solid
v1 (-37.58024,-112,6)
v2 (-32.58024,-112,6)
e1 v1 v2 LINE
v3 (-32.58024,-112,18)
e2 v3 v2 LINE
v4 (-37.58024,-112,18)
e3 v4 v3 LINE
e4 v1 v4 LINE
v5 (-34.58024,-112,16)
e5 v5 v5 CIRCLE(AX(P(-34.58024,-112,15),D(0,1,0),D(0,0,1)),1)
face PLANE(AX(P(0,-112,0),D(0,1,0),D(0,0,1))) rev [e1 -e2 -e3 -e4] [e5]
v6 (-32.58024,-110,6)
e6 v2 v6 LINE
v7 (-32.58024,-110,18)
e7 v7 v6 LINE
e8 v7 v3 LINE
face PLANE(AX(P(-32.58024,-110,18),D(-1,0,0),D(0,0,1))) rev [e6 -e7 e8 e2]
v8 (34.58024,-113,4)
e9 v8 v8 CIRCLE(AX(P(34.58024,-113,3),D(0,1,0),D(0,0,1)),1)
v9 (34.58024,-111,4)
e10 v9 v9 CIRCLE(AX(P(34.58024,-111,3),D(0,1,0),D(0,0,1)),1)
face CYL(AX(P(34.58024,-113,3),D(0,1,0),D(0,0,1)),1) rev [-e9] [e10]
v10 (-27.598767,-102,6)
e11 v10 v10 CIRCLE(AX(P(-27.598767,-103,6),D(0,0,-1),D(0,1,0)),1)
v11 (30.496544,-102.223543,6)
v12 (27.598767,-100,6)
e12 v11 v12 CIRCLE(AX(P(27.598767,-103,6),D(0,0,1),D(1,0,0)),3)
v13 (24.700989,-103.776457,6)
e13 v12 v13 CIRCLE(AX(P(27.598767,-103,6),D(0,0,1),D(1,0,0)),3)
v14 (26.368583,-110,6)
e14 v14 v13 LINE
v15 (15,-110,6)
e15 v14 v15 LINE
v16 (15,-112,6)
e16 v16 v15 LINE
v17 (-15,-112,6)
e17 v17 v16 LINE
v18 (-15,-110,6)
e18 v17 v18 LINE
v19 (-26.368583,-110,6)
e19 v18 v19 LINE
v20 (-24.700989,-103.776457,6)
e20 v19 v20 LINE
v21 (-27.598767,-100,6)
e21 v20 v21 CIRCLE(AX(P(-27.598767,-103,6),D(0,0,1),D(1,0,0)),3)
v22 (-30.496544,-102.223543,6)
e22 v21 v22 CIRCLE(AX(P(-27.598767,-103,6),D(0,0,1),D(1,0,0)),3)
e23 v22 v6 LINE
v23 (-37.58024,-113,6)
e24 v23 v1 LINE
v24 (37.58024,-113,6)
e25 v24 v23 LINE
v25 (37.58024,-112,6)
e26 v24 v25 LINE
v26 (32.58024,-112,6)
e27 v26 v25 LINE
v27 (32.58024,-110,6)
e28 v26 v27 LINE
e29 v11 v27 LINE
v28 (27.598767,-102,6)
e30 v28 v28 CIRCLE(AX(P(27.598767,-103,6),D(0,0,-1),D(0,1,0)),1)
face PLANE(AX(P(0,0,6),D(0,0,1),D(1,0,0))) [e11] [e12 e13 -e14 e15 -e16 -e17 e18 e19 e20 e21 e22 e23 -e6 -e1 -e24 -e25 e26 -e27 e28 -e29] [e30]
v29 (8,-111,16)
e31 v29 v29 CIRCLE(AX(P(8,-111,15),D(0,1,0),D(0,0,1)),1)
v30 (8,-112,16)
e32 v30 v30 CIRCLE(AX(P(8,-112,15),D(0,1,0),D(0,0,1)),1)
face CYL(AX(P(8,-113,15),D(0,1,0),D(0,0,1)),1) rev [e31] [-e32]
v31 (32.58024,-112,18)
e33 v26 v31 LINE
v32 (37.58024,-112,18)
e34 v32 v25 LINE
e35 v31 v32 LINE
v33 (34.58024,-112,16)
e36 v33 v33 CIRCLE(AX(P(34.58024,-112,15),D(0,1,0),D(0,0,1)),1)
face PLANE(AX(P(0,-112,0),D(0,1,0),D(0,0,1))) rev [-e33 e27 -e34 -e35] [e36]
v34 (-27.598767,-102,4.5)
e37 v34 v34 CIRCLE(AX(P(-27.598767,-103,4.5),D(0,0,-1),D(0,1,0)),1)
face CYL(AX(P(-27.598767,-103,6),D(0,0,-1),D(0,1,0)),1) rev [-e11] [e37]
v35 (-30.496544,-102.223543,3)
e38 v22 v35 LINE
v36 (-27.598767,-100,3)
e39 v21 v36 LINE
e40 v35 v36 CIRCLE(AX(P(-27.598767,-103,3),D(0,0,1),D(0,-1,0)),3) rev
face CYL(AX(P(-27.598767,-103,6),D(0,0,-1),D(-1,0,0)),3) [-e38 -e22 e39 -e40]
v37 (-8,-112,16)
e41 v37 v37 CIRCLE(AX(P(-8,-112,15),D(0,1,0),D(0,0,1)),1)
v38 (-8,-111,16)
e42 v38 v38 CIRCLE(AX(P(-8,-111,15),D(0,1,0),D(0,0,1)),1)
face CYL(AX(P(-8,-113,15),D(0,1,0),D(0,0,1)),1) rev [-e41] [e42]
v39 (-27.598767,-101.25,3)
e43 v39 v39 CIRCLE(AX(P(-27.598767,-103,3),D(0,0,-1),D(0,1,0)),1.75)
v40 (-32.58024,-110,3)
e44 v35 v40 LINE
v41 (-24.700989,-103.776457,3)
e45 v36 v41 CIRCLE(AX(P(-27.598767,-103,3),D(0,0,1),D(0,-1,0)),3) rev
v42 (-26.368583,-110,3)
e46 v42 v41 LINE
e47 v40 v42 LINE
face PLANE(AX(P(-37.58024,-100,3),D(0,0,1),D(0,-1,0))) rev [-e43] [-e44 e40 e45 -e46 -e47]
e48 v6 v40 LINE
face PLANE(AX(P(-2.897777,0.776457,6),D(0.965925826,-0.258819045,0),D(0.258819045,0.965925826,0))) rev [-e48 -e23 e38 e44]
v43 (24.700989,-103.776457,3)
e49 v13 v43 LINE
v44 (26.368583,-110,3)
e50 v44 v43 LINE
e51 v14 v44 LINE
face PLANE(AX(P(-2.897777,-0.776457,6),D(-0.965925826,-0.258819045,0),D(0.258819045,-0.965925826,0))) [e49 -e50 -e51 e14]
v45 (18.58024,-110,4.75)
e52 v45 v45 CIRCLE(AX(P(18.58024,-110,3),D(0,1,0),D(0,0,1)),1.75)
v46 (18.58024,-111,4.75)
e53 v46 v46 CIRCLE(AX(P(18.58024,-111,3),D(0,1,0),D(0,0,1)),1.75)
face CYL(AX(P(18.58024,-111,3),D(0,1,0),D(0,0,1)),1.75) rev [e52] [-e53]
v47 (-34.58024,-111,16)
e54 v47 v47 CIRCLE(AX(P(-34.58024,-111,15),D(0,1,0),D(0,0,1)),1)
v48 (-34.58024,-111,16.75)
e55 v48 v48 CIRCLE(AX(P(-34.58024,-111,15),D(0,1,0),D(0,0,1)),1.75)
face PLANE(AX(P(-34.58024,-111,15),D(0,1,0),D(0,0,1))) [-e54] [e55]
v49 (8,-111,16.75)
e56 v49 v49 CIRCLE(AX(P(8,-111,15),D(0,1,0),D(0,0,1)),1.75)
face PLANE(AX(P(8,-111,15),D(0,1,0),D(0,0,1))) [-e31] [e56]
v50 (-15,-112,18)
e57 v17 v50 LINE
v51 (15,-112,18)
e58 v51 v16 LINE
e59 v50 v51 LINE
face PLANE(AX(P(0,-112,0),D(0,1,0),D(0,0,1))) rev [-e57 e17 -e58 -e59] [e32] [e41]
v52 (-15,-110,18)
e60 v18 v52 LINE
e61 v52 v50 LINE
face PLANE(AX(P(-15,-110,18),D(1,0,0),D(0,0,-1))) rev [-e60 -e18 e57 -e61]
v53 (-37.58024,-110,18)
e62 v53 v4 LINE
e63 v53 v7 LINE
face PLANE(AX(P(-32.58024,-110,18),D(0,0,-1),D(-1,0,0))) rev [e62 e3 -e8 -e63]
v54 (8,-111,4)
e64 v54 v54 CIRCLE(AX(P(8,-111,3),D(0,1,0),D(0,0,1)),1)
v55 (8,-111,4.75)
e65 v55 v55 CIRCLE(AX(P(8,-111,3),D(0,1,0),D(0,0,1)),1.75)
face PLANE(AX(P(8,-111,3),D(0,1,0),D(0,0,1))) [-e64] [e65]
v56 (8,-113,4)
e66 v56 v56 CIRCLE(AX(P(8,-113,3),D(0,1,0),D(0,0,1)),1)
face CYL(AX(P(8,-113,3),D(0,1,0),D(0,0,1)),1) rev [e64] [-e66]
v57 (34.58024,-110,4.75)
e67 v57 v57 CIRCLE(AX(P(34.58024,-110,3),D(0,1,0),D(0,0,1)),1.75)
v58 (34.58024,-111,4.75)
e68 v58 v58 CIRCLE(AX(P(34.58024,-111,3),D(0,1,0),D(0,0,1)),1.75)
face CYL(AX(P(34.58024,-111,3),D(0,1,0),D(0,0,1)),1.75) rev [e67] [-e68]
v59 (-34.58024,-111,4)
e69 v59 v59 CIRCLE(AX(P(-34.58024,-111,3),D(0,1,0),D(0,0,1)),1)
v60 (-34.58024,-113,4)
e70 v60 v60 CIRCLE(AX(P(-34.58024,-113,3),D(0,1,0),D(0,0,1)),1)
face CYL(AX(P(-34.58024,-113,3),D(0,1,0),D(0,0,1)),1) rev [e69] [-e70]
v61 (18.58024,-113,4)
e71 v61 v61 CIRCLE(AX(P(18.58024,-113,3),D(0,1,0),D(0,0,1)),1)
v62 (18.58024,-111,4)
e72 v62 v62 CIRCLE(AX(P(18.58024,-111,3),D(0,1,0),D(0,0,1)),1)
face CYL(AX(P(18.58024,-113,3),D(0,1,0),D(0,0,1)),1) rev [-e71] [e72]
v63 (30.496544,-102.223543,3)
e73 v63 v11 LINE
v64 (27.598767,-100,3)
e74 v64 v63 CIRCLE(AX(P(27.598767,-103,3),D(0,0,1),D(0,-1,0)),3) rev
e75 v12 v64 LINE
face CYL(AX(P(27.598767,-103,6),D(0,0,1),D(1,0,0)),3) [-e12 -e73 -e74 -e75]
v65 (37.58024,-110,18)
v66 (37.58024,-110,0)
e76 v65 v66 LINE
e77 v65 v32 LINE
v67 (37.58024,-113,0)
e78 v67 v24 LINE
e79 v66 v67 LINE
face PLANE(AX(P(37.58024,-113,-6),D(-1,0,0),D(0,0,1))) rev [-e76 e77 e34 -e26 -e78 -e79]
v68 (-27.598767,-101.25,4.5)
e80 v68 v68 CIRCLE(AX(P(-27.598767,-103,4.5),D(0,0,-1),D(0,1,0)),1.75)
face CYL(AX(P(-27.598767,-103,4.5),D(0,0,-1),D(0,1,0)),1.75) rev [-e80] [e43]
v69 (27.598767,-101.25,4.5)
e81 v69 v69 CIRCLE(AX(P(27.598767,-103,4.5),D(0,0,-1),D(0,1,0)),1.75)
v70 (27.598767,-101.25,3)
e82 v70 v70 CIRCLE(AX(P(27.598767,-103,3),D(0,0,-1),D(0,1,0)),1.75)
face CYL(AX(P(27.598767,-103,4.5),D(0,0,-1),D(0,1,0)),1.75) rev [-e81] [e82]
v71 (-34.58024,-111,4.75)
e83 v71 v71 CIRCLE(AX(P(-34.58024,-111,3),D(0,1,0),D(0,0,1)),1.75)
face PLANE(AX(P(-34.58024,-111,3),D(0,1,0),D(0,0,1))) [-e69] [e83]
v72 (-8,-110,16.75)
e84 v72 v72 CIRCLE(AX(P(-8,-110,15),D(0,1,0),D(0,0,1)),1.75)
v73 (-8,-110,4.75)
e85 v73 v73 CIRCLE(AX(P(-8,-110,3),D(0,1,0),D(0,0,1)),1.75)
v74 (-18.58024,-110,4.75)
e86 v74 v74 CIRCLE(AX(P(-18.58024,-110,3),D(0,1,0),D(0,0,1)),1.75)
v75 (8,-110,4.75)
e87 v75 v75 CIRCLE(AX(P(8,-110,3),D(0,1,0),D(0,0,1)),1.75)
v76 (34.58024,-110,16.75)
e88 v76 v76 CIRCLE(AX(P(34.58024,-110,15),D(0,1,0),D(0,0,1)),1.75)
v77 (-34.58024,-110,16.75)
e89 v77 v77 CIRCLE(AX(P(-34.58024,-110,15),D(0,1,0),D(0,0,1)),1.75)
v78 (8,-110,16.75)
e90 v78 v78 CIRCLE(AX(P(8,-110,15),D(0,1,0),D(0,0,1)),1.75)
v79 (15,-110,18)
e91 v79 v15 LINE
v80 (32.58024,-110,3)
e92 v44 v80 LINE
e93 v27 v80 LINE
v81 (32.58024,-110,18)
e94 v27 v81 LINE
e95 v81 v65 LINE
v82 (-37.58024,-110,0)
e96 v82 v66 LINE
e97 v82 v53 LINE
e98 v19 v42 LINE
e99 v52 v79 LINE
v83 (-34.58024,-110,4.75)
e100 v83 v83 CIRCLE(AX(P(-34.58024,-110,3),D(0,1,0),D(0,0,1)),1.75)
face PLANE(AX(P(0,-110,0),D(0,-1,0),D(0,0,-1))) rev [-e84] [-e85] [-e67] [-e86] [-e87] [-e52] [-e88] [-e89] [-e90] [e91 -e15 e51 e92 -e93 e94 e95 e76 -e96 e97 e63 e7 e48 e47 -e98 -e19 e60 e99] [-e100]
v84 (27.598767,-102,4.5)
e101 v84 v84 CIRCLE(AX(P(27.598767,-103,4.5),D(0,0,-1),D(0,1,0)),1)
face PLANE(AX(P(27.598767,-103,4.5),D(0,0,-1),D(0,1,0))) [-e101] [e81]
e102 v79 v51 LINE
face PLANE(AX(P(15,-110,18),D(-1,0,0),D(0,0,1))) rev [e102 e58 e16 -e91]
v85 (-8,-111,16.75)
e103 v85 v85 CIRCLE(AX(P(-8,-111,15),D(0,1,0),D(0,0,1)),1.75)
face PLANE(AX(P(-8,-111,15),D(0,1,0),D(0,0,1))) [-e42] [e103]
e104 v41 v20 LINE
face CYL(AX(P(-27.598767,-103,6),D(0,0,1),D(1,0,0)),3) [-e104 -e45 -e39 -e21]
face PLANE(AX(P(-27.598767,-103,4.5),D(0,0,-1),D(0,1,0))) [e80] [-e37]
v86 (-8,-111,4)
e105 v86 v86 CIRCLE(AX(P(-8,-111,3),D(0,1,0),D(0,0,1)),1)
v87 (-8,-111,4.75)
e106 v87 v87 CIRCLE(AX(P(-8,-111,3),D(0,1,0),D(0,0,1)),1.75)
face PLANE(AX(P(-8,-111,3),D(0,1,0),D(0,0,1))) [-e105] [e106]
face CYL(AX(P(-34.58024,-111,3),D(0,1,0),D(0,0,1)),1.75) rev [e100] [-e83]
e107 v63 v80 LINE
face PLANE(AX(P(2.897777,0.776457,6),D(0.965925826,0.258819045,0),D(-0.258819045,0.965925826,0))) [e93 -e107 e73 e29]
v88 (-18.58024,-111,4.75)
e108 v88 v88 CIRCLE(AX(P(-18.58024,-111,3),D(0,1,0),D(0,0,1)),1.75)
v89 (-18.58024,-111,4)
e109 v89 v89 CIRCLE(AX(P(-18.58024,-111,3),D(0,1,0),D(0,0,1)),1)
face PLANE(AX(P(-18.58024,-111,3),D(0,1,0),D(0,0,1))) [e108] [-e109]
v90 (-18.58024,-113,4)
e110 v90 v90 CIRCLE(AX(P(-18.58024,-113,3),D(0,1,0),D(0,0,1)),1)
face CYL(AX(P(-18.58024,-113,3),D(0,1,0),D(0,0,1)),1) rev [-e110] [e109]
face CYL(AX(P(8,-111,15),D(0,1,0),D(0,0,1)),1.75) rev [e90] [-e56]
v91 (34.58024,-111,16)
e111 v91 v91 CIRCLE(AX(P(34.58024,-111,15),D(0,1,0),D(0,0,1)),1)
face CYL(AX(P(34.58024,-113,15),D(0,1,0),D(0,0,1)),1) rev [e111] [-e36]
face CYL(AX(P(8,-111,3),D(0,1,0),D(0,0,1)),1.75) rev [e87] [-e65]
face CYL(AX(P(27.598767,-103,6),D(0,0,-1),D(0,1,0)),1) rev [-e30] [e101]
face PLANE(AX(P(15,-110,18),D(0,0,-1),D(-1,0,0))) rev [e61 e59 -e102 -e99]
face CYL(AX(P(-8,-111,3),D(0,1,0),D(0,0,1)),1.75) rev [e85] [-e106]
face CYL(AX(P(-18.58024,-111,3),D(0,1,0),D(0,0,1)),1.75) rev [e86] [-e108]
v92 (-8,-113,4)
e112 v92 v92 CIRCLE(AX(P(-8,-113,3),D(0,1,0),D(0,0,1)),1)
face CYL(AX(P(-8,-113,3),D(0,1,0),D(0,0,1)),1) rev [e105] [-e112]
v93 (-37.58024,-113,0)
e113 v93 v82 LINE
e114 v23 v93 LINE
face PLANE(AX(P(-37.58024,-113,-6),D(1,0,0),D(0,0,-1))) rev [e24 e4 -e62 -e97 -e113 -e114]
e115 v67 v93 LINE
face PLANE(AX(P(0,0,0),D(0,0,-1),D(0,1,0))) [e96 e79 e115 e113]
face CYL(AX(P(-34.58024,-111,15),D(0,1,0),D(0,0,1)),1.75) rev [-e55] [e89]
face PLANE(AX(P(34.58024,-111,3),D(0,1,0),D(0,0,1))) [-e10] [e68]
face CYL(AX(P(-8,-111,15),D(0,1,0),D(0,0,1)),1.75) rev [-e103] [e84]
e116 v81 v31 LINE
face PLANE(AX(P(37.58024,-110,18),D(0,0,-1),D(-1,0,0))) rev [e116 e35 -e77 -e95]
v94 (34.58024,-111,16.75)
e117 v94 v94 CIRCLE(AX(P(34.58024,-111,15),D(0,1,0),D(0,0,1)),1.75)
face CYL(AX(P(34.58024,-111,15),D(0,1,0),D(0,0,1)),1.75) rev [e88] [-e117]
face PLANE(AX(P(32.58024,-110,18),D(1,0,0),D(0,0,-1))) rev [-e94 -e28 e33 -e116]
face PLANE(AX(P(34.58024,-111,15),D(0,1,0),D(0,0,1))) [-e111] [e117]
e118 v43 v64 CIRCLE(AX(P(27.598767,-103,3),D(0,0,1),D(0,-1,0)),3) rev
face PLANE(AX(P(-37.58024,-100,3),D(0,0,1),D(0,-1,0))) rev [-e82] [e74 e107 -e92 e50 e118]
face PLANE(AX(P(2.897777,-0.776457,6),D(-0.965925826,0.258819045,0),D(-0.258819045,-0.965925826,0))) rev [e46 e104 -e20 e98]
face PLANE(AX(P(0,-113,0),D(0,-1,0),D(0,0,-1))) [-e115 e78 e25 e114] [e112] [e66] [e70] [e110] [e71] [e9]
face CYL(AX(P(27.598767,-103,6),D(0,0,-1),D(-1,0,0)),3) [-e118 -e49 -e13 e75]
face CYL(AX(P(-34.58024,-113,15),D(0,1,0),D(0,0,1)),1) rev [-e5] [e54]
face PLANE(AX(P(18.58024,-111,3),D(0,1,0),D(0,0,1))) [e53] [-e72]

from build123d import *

# Parameters (mm, degrees)
SKETCH_1_R           = 0.75
EXTRUDE_1_DEPTH      = 6
SKETCH_2_R           = 1
CUT_EXTRUDE_1_DEPTH  = 1.5
SKETCH_3_W           = 75.160479418
SKETCH_3_H           = 12
EXTRUDE_2_DEPTH      = 3
SKETCH_4_R           = 0.75
CUT_EXTRUDE_2_DEPTH  = 3
SKETCH_5_W           = 5
SKETCH_5_H           = 12
SKETCH_5_W_2         = 30
CUT_EXTRUDE_3_DEPTH  = 2
SKETCH_6_OUTSIDE_W   = 104.908
SKETCH_6_OUTSIDE_H   = 145.748
SKETCH_6_OUTSIDE_W_2 = 75.160479418
SKETCH_6_OUTSIDE_H_2 = 13
CUT_EXTRUDE_4_DEPTH  = 120.23621269
SKETCH_7_W           = 9
SKETCH_7_H           = 13
CUT_EXTRUDE_5_DEPTH  = 136.845859953
SKETCH_8_R           = 1
CUT_EXTRUDE_6_DEPTH  = 120.122938247
SKETCH_8_3_R         = 1.75
SKETCH_8_3_R_2       = 1
CUT_EXTRUDE_7_DEPTH  = 1.5
SKETCH_9_W           = 5
SKETCH_9_H           = 15
SKETCH_9_W_2         = 30
EXTRUDE_3_DEPTH      = 2
SKETCH_10_W          = 75.160479418
SKETCH_10_H          = 3
EXTRUDE_4_DEPTH      = 3
SKETCH_11_R          = 1
CUT_EXTRUDE_8_DEPTH  = 43.851772619
SKETCH_11_3_R        = 1.75
SKETCH_11_3_R_2      = 1
CUT_EXTRUDE_9_DEPTH  = 1
FILLET_1_R           = 3


with BuildPart() as part:
    # 草图1 → 凸台-拉伸1 (new body)
    with BuildSketch(Plane.XY):
        with BuildLine():
            Line((0, -11.591109915), (26.368582626, -110))
            Line((26.368582626, -110), (32.580239709, -110))
            Line((32.580239709, -110), (2.897777479, 0.776457135))
            ThreePointArc((2.897777479, 0.776457135), (0, 3), (-2.897777479, 0.776457135))
            Line((-2.897777479, 0.776457135), (-32.580239709, -110))
            Line((-32.580239709, -110), (-26.368582626, -110))
            Line((-26.368582626, -110), (0, -11.591109915))
        make_face()
        with Locations((13.665408814, -51)):
            Circle(SKETCH_1_R, mode=Mode.SUBTRACT)
        Circle(SKETCH_1_R, mode=Mode.SUBTRACT)
        with Locations((-13.665408814, -51)):
            Circle(SKETCH_1_R, mode=Mode.SUBTRACT)
    extrude(amount=EXTRUDE_1_DEPTH)

    # 草图2 → 切除-拉伸1 (cut)
    with BuildSketch(Plane(origin=(0, 0, 0), x_dir=(-1, 0, 0), z_dir=(0, 0, -1))):
        Circle(SKETCH_2_R)
        with Locations((13.665408814, -51)):
            Circle(SKETCH_2_R)
        with Locations((-13.665408814, -51)):
            Circle(SKETCH_2_R)
    extrude(amount=-CUT_EXTRUDE_1_DEPTH, mode=Mode.SUBTRACT)

    # 草图3 → 凸台-拉伸2 (add)
    with BuildSketch(Plane.XZ.offset(110)):
        Rectangle(SKETCH_3_W, SKETCH_3_H)
    extrude(amount=EXTRUDE_2_DEPTH)

    # 草图4 → 切除-拉伸2 (cut)
    with BuildSketch(Plane.XY.offset(6)):
        with Locations((-27.59876682, -103)):
            Circle(SKETCH_4_R)
        with Locations((27.59876682, -103)):
            Circle(SKETCH_4_R)
    extrude(amount=-CUT_EXTRUDE_2_DEPTH, mode=Mode.SUBTRACT)

    # 草图5 → 切除-拉伸3 (cut)
    with BuildSketch(Plane(origin=(0, -110, 0), x_dir=(1, 0, 0), z_dir=(0, 1, 0))):
        with Locations((-35.080239709, 0)):
            Rectangle(SKETCH_5_W, SKETCH_5_H)
        with Locations((35.080239709, 0)):
            Rectangle(SKETCH_5_W, SKETCH_5_H)
        Rectangle(SKETCH_5_W_2, SKETCH_5_H)
    extrude(amount=-CUT_EXTRUDE_3_DEPTH, mode=Mode.SUBTRACT)

    # 草图6 outside → 切除-拉伸4 (cut, through all)
    with BuildSketch(Plane(origin=(0, 0, 0), x_dir=(-1, 0, 0), z_dir=(0, 0, -1))):
        with Locations((0, -55)):
            Rectangle(SKETCH_6_OUTSIDE_W, SKETCH_6_OUTSIDE_H)
        with Locations((0, -106.5)):
            Rectangle(SKETCH_6_OUTSIDE_W_2, SKETCH_6_OUTSIDE_H_2, mode=Mode.SUBTRACT)
    extrude(amount=-CUT_EXTRUDE_4_DEPTH, mode=Mode.SUBTRACT)

    # 草图7 → 切除-拉伸5 (cut, through all)
    with BuildSketch(Plane(origin=(37.580239709, 0, 0), x_dir=(0, 0, -1), z_dir=(1, 0, 0))):
        with Locations((1.5, -106.5)):
            Rectangle(SKETCH_7_W, SKETCH_7_H)
    extrude(amount=-CUT_EXTRUDE_5_DEPTH, mode=Mode.SUBTRACT)

    # 草图8 → 切除-拉伸6 (cut, through all)
    with BuildSketch(Plane(origin=(0, 0, 3), x_dir=(-1, 0, 0), z_dir=(0, 0, -1))):
        with Locations(Location((-27.59876682, -103, 0), (0, 0, 90))):
            Circle(SKETCH_8_R)
        with Locations(Location((27.59876682, -103, 0), (0, 0, 90))):
            Circle(SKETCH_8_R)
    extrude(amount=-CUT_EXTRUDE_6_DEPTH, mode=Mode.SUBTRACT)

    # 草图8<3> → 切除-拉伸7 (cut)
    # profile 1 of 2: a face of its own
    with BuildSketch(Plane(origin=(0, 0, 3), x_dir=(-1, 0, 0), z_dir=(0, 0, -1))):
        with Locations(Location((-27.59876682, -103, 0), (0, 0, 90))):
            Circle(SKETCH_8_3_R)
        with Locations(Location((-27.59876682, -103, 0), (0, 0, 90))):
            Circle(SKETCH_8_3_R_2, mode=Mode.SUBTRACT)
    # profile 2 of 2: a face of its own
    with BuildSketch(Plane(origin=(0, 0, 3), x_dir=(-1, 0, 0), z_dir=(0, 0, -1))):
        with Locations(Location((27.59876682, -103, 0), (0, 0, 90))):
            Circle(SKETCH_8_3_R)
        with Locations(Location((27.59876682, -103, 0), (0, 0, 90))):
            Circle(SKETCH_8_3_R_2, mode=Mode.SUBTRACT)
    extrude(amount=-CUT_EXTRUDE_7_DEPTH, mode=Mode.SUBTRACT)

    # 草图9 → 凸台-拉伸3 (add)
    with BuildSketch(Plane(origin=(0, -112, 0), x_dir=(1, 0, 0), z_dir=(0, 1, 0))):
        with Locations((35.080239709, -10.5)):
            Rectangle(SKETCH_9_W, SKETCH_9_H)
        with Locations((0, -10.5)):
            Rectangle(SKETCH_9_W_2, SKETCH_9_H)
        with Locations((-35.080239709, -10.5)):
            Rectangle(SKETCH_9_W, SKETCH_9_H)
    extrude(amount=EXTRUDE_3_DEPTH)

    # 草图10 → 凸台-拉伸4 (add)
    with BuildSketch(Plane(origin=(0, 0, 3), x_dir=(-1, 0, 0), z_dir=(0, 0, -1))):
        with Locations((0, -111.5)):
            Rectangle(SKETCH_10_W, SKETCH_10_H)
    extrude(amount=EXTRUDE_4_DEPTH)

    # 草图11 → 切除-拉伸8 (cut, through all)
    with BuildSketch(Plane(origin=(0, -110, 0), x_dir=(1, 0, 0), z_dir=(0, 1, 0))):
        with Locations(Location((34.580239709, -15, 0), (0, 0, 270))):
            Circle(SKETCH_11_R)
        with Locations(Location((34.580239709, -3, 0), (0, 0, 270))):
            Circle(SKETCH_11_R)
        with Locations(Location((-18.580239709, -3, 0), (0, 0, 270))):
            Circle(SKETCH_11_R)
        with Locations(Location((18.580239709, -3, 0), (0, 0, 270))):
            Circle(SKETCH_11_R)
        with Locations(Location((-34.580239709, -3, 0), (0, 0, 270))):
            Circle(SKETCH_11_R)
        with Locations(Location((-34.580239709, -15, 0), (0, 0, 270))):
            Circle(SKETCH_11_R)
        with Locations((18.580239709, -15)):
            Circle(SKETCH_11_R)
        with Locations((-18.580239709, -15)):
            Circle(SKETCH_11_R)
        with Locations(Location((-8, -3, 0), (0, 0, 270))):
            Circle(SKETCH_11_R)
        with Locations(Location((8, -3, 0), (0, 0, 270))):
            Circle(SKETCH_11_R)
        with Locations(Location((-8, -15, 0), (0, 0, 270))):
            Circle(SKETCH_11_R)
        with Locations(Location((8, -15, 0), (0, 0, 270))):
            Circle(SKETCH_11_R)
    extrude(amount=-CUT_EXTRUDE_8_DEPTH, mode=Mode.SUBTRACT)

    # 草图11<3> → 切除-拉伸9 (cut)
    # profile 1 of 12: a face of its own
    with BuildSketch(Plane(origin=(0, -110, 0), x_dir=(1, 0, 0), z_dir=(0, 1, 0))):
        with Locations(Location((34.580239709, -15, 0), (0, 0, 270))):
            Circle(SKETCH_11_3_R)
        with Locations(Location((34.580239709, -15, 0), (0, 0, 270))):
            Circle(SKETCH_11_3_R_2, mode=Mode.SUBTRACT)
    # profile 2 of 12: a face of its own
    with BuildSketch(Plane(origin=(0, -110, 0), x_dir=(1, 0, 0), z_dir=(0, 1, 0))):
        with Locations(Location((34.580239709, -3, 0), (0, 0, 270))):
            Circle(SKETCH_11_3_R)
        with Locations(Location((34.580239709, -3, 0), (0, 0, 270))):
            Circle(SKETCH_11_3_R_2, mode=Mode.SUBTRACT)
    # profile 3 of 12: a face of its own
    with BuildSketch(Plane(origin=(0, -110, 0), x_dir=(1, 0, 0), z_dir=(0, 1, 0))):
        with Locations(Location((18.580239709, -3, 0), (0, 0, 270))):
            Circle(SKETCH_11_3_R)
        with Locations(Location((18.580239709, -3, 0), (0, 0, 270))):
            Circle(SKETCH_11_3_R_2, mode=Mode.SUBTRACT)
    # profile 4 of 12: a face of its own
    with BuildSketch(Plane(origin=(0, -110, 0), x_dir=(1, 0, 0), z_dir=(0, 1, 0))):
        with Locations(Location((-18.580239709, -3, 0), (0, 0, 270))):
            Circle(SKETCH_11_3_R)
        with Locations(Location((-18.580239709, -3, 0), (0, 0, 270))):
            Circle(SKETCH_11_3_R_2, mode=Mode.SUBTRACT)
    # profile 5 of 12: a face of its own
    with BuildSketch(Plane(origin=(0, -110, 0), x_dir=(1, 0, 0), z_dir=(0, 1, 0))):
        with Locations(Location((-34.580239709, -3, 0), (0, 0, 270))):
            Circle(SKETCH_11_3_R)
        with Locations(Location((-34.580239709, -3, 0), (0, 0, 270))):
            Circle(SKETCH_11_3_R_2, mode=Mode.SUBTRACT)
    # profile 6 of 12: a face of its own
    with BuildSketch(Plane(origin=(0, -110, 0), x_dir=(1, 0, 0), z_dir=(0, 1, 0))):
        with Locations(Location((-34.580239709, -15, 0), (0, 0, 270))):
            Circle(SKETCH_11_3_R)
        with Locations(Location((-34.580239709, -15, 0), (0, 0, 270))):
            Circle(SKETCH_11_3_R_2, mode=Mode.SUBTRACT)
    # profile 7 of 12: a face of its own
    with BuildSketch(Plane(origin=(0, -110, 0), x_dir=(1, 0, 0), z_dir=(0, 1, 0))):
        with Locations((18.580239709, -15)):
            Circle(SKETCH_11_3_R)
        with Locations((18.580239709, -15)):
            Circle(SKETCH_11_3_R_2, mode=Mode.SUBTRACT)
    # profile 8 of 12: a face of its own
    with BuildSketch(Plane(origin=(0, -110, 0), x_dir=(1, 0, 0), z_dir=(0, 1, 0))):
        with Locations((-18.580239709, -15)):
            Circle(SKETCH_11_3_R)
        with Locations((-18.580239709, -15)):
            Circle(SKETCH_11_3_R_2, mode=Mode.SUBTRACT)
    # profile 9 of 12: a face of its own
    with BuildSketch(Plane(origin=(0, -110, 0), x_dir=(1, 0, 0), z_dir=(0, 1, 0))):
        with Locations(Location((-8, -3, 0), (0, 0, 270))):
            Circle(SKETCH_11_3_R)
        with Locations(Location((-8, -3, 0), (0, 0, 270))):
            Circle(SKETCH_11_3_R_2, mode=Mode.SUBTRACT)
    # profile 10 of 12: a face of its own
    with BuildSketch(Plane(origin=(0, -110, 0), x_dir=(1, 0, 0), z_dir=(0, 1, 0))):
        with Locations(Location((8, -3, 0), (0, 0, 270))):
            Circle(SKETCH_11_3_R)
        with Locations(Location((8, -3, 0), (0, 0, 270))):
            Circle(SKETCH_11_3_R_2, mode=Mode.SUBTRACT)
    # profile 11 of 12: a face of its own
    with BuildSketch(Plane(origin=(0, -110, 0), x_dir=(1, 0, 0), z_dir=(0, 1, 0))):
        with Locations(Location((-8, -15, 0), (0, 0, 270))):
            Circle(SKETCH_11_3_R)
        with Locations(Location((-8, -15, 0), (0, 0, 270))):
            Circle(SKETCH_11_3_R_2, mode=Mode.SUBTRACT)
    # profile 12 of 12: a face of its own
    with BuildSketch(Plane(origin=(0, -110, 0), x_dir=(1, 0, 0), z_dir=(0, 1, 0))):
        with Locations(Location((8, -15, 0), (0, 0, 270))):
            Circle(SKETCH_11_3_R)
        with Locations(Location((8, -15, 0), (0, 0, 270))):
            Circle(SKETCH_11_3_R_2, mode=Mode.SUBTRACT)
    extrude(amount=-CUT_EXTRUDE_9_DEPTH, mode=Mode.SUBTRACT)

    # 圆角1
    fillet_1_edges = [part.edges().sort_by_distance(p)[0] for p in [
        (-29.900747784, -100, 4.5),
        (-23.689090702, -100, 4.5),
        (23.689090702, -100, 4.5),
        (29.900747784, -100, 4.5),
    ]]
    fillet(fillet_1_edges, radius=FILLET_1_R - 0.0001)  # a hair under: the kernel refuses the full size


solid = part.part
